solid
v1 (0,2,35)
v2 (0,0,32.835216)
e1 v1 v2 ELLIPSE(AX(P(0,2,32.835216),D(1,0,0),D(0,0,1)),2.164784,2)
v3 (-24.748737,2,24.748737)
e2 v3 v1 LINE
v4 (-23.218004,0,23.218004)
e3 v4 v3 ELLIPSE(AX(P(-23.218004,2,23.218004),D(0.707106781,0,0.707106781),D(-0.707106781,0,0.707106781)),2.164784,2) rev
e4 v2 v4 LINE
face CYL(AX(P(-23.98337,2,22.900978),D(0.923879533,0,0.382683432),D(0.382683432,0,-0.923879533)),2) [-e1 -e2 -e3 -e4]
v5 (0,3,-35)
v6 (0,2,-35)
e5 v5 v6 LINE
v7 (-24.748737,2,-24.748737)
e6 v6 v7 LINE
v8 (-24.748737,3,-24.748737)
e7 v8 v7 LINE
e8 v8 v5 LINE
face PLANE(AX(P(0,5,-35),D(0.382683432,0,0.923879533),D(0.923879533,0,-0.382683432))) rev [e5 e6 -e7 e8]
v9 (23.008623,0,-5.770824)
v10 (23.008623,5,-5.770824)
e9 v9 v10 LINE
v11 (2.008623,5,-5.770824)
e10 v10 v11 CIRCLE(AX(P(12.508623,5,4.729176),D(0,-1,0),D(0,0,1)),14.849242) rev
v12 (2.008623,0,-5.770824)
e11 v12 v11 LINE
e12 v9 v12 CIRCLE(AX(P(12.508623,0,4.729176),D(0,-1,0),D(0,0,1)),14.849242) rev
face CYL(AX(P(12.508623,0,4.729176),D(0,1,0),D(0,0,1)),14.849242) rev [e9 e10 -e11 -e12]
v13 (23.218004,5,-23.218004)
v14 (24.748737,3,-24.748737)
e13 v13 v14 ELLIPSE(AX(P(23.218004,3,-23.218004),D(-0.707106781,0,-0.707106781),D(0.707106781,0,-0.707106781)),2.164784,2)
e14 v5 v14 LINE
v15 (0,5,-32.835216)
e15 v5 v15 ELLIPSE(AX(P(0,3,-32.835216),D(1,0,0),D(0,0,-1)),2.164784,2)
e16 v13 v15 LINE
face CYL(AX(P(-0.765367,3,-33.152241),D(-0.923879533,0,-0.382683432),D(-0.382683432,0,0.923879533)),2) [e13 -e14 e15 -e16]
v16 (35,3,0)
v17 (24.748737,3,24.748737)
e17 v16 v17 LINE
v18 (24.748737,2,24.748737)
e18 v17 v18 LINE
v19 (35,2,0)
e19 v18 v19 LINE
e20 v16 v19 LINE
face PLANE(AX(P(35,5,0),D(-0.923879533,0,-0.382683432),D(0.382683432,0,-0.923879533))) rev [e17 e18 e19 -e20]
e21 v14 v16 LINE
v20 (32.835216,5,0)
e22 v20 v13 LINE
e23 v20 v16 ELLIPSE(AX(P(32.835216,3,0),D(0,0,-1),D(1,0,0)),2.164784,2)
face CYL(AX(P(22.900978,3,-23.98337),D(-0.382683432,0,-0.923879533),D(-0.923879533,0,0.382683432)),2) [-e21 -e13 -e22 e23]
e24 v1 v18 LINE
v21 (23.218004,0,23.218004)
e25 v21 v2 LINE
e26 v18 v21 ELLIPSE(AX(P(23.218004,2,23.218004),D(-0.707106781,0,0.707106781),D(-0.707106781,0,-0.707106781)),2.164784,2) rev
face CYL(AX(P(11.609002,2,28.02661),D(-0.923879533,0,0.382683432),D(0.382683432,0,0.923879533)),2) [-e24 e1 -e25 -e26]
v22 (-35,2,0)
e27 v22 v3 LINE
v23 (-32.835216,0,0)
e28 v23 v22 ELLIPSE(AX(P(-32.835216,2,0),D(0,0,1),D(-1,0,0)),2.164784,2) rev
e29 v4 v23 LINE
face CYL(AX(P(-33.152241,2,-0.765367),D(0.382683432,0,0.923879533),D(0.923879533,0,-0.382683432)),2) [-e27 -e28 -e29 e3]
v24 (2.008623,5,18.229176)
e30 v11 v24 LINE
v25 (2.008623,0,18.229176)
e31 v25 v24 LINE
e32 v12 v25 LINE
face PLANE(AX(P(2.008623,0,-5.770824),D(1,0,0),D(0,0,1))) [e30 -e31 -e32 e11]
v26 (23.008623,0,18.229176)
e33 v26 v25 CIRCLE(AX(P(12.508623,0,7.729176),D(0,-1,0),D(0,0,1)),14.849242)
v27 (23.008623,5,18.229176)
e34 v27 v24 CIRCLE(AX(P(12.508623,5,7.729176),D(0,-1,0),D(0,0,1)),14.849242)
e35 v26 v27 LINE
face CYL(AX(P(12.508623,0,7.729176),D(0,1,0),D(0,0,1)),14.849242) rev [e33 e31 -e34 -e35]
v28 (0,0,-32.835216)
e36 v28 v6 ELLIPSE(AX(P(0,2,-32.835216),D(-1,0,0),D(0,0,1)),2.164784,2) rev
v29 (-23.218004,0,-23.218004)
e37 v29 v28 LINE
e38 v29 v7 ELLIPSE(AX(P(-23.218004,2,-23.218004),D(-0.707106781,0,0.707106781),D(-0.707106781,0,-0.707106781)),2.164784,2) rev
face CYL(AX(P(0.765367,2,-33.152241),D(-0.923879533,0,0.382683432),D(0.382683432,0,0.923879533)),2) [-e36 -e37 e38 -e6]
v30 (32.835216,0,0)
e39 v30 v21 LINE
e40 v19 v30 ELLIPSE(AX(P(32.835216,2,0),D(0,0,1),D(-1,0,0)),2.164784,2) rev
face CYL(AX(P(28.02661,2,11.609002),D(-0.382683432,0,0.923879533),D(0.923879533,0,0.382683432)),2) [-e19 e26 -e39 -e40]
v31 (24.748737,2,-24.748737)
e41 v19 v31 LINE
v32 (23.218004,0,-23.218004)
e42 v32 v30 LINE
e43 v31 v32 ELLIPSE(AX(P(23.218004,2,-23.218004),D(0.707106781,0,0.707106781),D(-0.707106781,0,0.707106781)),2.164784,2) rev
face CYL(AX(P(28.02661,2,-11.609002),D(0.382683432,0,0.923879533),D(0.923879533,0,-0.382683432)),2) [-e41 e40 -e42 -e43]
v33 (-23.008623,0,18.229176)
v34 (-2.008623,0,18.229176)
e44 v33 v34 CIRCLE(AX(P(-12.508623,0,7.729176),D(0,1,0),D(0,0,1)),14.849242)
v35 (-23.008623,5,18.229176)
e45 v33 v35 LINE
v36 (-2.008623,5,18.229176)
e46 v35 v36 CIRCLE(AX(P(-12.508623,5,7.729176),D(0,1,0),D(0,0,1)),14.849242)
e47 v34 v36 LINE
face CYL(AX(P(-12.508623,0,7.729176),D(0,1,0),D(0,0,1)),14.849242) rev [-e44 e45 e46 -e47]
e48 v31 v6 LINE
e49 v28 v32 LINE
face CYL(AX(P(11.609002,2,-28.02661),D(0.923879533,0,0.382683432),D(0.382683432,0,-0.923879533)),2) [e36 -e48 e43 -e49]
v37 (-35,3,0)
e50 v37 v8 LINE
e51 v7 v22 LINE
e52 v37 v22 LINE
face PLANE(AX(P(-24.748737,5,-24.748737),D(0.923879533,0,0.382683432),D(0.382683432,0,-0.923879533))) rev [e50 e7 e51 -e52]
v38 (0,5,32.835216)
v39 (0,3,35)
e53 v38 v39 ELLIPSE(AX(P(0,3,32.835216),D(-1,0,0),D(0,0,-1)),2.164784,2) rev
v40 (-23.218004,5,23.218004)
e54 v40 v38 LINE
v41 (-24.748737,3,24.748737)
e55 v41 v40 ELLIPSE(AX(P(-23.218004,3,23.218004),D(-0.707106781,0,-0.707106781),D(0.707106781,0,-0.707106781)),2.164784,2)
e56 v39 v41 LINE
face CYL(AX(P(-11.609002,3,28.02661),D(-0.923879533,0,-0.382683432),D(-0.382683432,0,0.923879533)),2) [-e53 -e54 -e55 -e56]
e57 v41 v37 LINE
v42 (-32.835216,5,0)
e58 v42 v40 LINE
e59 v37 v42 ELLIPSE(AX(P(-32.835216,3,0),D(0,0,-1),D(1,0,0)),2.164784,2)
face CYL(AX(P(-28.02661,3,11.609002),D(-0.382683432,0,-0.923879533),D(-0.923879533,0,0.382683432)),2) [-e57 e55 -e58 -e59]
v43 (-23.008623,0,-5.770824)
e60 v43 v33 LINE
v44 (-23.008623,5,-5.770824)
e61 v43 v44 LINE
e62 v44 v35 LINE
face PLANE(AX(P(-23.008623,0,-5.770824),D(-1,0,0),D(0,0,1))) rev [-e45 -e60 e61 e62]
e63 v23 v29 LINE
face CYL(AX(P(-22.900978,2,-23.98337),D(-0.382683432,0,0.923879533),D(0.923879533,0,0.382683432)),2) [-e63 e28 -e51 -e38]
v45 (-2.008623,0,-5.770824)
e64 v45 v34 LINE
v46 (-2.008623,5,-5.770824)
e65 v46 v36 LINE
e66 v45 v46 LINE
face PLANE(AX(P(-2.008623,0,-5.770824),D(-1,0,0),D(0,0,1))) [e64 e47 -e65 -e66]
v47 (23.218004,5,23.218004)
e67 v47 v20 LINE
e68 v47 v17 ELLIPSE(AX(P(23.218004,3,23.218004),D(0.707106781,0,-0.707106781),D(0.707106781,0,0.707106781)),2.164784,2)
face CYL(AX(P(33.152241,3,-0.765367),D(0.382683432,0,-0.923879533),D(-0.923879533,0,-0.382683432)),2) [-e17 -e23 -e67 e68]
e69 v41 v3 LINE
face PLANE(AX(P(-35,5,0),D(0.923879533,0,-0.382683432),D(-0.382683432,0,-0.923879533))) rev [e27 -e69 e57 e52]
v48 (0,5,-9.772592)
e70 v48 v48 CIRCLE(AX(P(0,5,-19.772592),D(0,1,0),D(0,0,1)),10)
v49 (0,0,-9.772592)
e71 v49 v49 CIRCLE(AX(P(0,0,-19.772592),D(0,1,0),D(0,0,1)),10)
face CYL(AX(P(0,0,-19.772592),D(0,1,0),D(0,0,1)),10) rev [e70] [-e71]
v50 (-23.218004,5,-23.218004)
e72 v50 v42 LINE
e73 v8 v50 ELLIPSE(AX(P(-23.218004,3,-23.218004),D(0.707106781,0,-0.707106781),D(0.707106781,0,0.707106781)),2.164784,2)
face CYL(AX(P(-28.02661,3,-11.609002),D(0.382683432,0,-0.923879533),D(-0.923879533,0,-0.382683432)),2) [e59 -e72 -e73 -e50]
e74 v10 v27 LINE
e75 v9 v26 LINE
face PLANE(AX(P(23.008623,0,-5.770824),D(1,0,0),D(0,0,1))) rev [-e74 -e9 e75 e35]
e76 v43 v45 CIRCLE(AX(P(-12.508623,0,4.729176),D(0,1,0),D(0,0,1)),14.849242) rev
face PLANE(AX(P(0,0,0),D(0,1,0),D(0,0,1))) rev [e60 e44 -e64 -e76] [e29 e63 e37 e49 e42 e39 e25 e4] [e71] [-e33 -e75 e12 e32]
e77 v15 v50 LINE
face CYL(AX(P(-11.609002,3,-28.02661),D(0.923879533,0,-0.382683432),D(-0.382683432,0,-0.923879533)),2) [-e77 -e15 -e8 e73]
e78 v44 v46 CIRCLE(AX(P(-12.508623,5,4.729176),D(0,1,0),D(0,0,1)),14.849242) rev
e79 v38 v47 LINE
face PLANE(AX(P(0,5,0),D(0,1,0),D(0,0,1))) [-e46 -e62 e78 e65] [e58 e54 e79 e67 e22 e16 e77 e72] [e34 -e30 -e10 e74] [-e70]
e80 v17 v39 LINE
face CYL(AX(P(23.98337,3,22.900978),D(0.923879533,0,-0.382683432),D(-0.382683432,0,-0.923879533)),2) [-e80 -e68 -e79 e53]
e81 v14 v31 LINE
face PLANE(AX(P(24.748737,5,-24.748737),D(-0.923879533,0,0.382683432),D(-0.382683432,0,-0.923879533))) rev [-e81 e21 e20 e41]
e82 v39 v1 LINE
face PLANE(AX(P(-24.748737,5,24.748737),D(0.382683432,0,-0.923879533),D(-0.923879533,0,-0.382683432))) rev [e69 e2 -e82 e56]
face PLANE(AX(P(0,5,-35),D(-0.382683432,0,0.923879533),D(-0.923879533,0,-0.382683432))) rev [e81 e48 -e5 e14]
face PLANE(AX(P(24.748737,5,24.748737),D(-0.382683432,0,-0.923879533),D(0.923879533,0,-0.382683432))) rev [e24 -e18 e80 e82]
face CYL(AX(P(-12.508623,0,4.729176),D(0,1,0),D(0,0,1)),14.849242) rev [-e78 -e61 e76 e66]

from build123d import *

# Parameters (mm, degrees)
BOSS_EXTRUDE1_DEPTH = 5
SKETCH4_W           = 21
SKETCH4_H           = 24
CUT_EXTRUDE1_DEPTH  = 5
CUT_EXTRUDE2_DEPTH  = 5
SKETCH10_W          = 47.253020793
SKETCH10_H          = 79.148030785
CUT_EXTRUDE3_DEPTH  = 5
MIRROR8_DEPTH       = 5
SKETCH11_R          = 10
CUT_EXTRUDE4_DEPTH  = 5
FILLET5_R           = 2


# Read off the part's stored shape, not the designer's step: Mirror8
with BuildPart() as part:
    # Sketch3 → Boss-Extrude1 (new body)
    with BuildSketch(Plane(origin=(0, 0, 0), x_dir=(1, 0, 0), z_dir=(0, 1, 0))):
        Polygon((35, 0), (24.748737342, 24.748737342), (0, 35), (-24.748737342, 24.748737342), (-35, 0), (-24.748737342, -24.748737342), (0, -35), (24.748737342, -24.748737342), align=None)
    extrude(amount=BOSS_EXTRUDE1_DEPTH)

    # Sketch4 → Cut-Extrude1 (cut)
    with BuildSketch(Plane(origin=(0, 5, 0), x_dir=(1, 0, 0), z_dir=(0, 1, 0))):
        with Locations((-12.508622631, -6.229175633)):
            Rectangle(SKETCH4_W, SKETCH4_H)
    extrude(amount=-CUT_EXTRUDE1_DEPTH, mode=Mode.SUBTRACT)

    # Sketch4<6> → Cut-Extrude2 (cut)
    with BuildSketch(Plane(origin=(0, 5, 0), x_dir=(1, 0, 0), z_dir=(0, 1, 0))):
        with BuildLine():
            ThreePointArc((-23.008622631, 5.770824367), (-12.508622631, 10.120066772), (-2.008622631, 5.770824367))
            Line((-2.008622631, 5.770824367), (-23.008622631, 5.770824367))
        make_face()
        with BuildLine():
            Line((-23.008622631, -18.229175633), (-2.008622631, -18.229175633))
            ThreePointArc((-2.008622631, -18.229175633), (-12.508622631, -22.578418038), (-23.008622631, -18.229175633))
        make_face()
    extrude(amount=-CUT_EXTRUDE2_DEPTH, mode=Mode.SUBTRACT)

    # Sketch10 → Cut-Extrude3 (cut)
    with BuildSketch(Plane(origin=(0, 5, 0), x_dir=(1, 0, 0), z_dir=(0, 1, 0))):
        with Locations((23.626510397, -1.493894903)):
            Rectangle(SKETCH10_W, SKETCH10_H)
    extrude(amount=-CUT_EXTRUDE3_DEPTH, mode=Mode.SUBTRACT)

    # Mirror8 outline → Mirror8 (add)
    with BuildSketch(Plane(origin=(0, 0, 0), x_dir=(1, 0, 0), z_dir=(0, 1, 0))):
        Polygon((24.748737342, 24.748737342), (0, 35), (0, -35), (24.748737342, -24.748737342), (35, 0), align=None)
        with BuildLine():
            ThreePointArc((2.008622631, 5.770824367), (12.508622631, 10.120066772), (23.008622631, 5.770824367))
            Line((23.008622631, 5.770824367), (23.008622631, -18.229175633))
            ThreePointArc((23.008622631, -18.229175633), (12.508622631, -22.578418038), (2.008622631, -18.229175633))
            Line((2.008622631, -18.229175633), (2.008622631, 5.770824367))
        make_face(mode=Mode.SUBTRACT)
    extrude(amount=MIRROR8_DEPTH)

    # Sketch11 → Cut-Extrude4 (cut)
    with BuildSketch(Plane(origin=(0, 5, 0), x_dir=(1, 0, 0), z_dir=(0, 1, 0))):
        with Locations(Location((0, 19.772592196, 0), (0, 0, 270))):
            Circle(SKETCH11_R)
    extrude(amount=-CUT_EXTRUDE4_DEPTH, mode=Mode.SUBTRACT)

    # Fillet5
    fillet5_edges = [part.edges().sort_by_distance(p)[0] for p in [
        (-12.374368671, 5, -29.874368671),
        (-29.874368671, 5, -12.374368671),
        (-29.874368671, 5, 12.374368671),
        (-12.374368671, 5, 29.874368671),
        (12.374368671, 5, -29.874368671),
        (29.874368671, 5, -12.374368671),
        (29.874368671, 5, 12.374368671),
        (12.374368671, 0, -29.874368671),
        (29.874368671, 0, -12.374368671),
        (29.874368671, 0, 12.374368671),
        (12.374368671, 0, 29.874368671),
        (12.374368671, 5, 29.874368671),
        (-12.374368671, 0, 29.874368671),
        (-29.874368671, 0, 12.374368671),
        (-29.874368671, 0, -12.374368671),
        (-12.374368671, 0, -29.874368671),
    ]]
    fillet(fillet5_edges, radius=FILLET5_R)


solid = part.part
